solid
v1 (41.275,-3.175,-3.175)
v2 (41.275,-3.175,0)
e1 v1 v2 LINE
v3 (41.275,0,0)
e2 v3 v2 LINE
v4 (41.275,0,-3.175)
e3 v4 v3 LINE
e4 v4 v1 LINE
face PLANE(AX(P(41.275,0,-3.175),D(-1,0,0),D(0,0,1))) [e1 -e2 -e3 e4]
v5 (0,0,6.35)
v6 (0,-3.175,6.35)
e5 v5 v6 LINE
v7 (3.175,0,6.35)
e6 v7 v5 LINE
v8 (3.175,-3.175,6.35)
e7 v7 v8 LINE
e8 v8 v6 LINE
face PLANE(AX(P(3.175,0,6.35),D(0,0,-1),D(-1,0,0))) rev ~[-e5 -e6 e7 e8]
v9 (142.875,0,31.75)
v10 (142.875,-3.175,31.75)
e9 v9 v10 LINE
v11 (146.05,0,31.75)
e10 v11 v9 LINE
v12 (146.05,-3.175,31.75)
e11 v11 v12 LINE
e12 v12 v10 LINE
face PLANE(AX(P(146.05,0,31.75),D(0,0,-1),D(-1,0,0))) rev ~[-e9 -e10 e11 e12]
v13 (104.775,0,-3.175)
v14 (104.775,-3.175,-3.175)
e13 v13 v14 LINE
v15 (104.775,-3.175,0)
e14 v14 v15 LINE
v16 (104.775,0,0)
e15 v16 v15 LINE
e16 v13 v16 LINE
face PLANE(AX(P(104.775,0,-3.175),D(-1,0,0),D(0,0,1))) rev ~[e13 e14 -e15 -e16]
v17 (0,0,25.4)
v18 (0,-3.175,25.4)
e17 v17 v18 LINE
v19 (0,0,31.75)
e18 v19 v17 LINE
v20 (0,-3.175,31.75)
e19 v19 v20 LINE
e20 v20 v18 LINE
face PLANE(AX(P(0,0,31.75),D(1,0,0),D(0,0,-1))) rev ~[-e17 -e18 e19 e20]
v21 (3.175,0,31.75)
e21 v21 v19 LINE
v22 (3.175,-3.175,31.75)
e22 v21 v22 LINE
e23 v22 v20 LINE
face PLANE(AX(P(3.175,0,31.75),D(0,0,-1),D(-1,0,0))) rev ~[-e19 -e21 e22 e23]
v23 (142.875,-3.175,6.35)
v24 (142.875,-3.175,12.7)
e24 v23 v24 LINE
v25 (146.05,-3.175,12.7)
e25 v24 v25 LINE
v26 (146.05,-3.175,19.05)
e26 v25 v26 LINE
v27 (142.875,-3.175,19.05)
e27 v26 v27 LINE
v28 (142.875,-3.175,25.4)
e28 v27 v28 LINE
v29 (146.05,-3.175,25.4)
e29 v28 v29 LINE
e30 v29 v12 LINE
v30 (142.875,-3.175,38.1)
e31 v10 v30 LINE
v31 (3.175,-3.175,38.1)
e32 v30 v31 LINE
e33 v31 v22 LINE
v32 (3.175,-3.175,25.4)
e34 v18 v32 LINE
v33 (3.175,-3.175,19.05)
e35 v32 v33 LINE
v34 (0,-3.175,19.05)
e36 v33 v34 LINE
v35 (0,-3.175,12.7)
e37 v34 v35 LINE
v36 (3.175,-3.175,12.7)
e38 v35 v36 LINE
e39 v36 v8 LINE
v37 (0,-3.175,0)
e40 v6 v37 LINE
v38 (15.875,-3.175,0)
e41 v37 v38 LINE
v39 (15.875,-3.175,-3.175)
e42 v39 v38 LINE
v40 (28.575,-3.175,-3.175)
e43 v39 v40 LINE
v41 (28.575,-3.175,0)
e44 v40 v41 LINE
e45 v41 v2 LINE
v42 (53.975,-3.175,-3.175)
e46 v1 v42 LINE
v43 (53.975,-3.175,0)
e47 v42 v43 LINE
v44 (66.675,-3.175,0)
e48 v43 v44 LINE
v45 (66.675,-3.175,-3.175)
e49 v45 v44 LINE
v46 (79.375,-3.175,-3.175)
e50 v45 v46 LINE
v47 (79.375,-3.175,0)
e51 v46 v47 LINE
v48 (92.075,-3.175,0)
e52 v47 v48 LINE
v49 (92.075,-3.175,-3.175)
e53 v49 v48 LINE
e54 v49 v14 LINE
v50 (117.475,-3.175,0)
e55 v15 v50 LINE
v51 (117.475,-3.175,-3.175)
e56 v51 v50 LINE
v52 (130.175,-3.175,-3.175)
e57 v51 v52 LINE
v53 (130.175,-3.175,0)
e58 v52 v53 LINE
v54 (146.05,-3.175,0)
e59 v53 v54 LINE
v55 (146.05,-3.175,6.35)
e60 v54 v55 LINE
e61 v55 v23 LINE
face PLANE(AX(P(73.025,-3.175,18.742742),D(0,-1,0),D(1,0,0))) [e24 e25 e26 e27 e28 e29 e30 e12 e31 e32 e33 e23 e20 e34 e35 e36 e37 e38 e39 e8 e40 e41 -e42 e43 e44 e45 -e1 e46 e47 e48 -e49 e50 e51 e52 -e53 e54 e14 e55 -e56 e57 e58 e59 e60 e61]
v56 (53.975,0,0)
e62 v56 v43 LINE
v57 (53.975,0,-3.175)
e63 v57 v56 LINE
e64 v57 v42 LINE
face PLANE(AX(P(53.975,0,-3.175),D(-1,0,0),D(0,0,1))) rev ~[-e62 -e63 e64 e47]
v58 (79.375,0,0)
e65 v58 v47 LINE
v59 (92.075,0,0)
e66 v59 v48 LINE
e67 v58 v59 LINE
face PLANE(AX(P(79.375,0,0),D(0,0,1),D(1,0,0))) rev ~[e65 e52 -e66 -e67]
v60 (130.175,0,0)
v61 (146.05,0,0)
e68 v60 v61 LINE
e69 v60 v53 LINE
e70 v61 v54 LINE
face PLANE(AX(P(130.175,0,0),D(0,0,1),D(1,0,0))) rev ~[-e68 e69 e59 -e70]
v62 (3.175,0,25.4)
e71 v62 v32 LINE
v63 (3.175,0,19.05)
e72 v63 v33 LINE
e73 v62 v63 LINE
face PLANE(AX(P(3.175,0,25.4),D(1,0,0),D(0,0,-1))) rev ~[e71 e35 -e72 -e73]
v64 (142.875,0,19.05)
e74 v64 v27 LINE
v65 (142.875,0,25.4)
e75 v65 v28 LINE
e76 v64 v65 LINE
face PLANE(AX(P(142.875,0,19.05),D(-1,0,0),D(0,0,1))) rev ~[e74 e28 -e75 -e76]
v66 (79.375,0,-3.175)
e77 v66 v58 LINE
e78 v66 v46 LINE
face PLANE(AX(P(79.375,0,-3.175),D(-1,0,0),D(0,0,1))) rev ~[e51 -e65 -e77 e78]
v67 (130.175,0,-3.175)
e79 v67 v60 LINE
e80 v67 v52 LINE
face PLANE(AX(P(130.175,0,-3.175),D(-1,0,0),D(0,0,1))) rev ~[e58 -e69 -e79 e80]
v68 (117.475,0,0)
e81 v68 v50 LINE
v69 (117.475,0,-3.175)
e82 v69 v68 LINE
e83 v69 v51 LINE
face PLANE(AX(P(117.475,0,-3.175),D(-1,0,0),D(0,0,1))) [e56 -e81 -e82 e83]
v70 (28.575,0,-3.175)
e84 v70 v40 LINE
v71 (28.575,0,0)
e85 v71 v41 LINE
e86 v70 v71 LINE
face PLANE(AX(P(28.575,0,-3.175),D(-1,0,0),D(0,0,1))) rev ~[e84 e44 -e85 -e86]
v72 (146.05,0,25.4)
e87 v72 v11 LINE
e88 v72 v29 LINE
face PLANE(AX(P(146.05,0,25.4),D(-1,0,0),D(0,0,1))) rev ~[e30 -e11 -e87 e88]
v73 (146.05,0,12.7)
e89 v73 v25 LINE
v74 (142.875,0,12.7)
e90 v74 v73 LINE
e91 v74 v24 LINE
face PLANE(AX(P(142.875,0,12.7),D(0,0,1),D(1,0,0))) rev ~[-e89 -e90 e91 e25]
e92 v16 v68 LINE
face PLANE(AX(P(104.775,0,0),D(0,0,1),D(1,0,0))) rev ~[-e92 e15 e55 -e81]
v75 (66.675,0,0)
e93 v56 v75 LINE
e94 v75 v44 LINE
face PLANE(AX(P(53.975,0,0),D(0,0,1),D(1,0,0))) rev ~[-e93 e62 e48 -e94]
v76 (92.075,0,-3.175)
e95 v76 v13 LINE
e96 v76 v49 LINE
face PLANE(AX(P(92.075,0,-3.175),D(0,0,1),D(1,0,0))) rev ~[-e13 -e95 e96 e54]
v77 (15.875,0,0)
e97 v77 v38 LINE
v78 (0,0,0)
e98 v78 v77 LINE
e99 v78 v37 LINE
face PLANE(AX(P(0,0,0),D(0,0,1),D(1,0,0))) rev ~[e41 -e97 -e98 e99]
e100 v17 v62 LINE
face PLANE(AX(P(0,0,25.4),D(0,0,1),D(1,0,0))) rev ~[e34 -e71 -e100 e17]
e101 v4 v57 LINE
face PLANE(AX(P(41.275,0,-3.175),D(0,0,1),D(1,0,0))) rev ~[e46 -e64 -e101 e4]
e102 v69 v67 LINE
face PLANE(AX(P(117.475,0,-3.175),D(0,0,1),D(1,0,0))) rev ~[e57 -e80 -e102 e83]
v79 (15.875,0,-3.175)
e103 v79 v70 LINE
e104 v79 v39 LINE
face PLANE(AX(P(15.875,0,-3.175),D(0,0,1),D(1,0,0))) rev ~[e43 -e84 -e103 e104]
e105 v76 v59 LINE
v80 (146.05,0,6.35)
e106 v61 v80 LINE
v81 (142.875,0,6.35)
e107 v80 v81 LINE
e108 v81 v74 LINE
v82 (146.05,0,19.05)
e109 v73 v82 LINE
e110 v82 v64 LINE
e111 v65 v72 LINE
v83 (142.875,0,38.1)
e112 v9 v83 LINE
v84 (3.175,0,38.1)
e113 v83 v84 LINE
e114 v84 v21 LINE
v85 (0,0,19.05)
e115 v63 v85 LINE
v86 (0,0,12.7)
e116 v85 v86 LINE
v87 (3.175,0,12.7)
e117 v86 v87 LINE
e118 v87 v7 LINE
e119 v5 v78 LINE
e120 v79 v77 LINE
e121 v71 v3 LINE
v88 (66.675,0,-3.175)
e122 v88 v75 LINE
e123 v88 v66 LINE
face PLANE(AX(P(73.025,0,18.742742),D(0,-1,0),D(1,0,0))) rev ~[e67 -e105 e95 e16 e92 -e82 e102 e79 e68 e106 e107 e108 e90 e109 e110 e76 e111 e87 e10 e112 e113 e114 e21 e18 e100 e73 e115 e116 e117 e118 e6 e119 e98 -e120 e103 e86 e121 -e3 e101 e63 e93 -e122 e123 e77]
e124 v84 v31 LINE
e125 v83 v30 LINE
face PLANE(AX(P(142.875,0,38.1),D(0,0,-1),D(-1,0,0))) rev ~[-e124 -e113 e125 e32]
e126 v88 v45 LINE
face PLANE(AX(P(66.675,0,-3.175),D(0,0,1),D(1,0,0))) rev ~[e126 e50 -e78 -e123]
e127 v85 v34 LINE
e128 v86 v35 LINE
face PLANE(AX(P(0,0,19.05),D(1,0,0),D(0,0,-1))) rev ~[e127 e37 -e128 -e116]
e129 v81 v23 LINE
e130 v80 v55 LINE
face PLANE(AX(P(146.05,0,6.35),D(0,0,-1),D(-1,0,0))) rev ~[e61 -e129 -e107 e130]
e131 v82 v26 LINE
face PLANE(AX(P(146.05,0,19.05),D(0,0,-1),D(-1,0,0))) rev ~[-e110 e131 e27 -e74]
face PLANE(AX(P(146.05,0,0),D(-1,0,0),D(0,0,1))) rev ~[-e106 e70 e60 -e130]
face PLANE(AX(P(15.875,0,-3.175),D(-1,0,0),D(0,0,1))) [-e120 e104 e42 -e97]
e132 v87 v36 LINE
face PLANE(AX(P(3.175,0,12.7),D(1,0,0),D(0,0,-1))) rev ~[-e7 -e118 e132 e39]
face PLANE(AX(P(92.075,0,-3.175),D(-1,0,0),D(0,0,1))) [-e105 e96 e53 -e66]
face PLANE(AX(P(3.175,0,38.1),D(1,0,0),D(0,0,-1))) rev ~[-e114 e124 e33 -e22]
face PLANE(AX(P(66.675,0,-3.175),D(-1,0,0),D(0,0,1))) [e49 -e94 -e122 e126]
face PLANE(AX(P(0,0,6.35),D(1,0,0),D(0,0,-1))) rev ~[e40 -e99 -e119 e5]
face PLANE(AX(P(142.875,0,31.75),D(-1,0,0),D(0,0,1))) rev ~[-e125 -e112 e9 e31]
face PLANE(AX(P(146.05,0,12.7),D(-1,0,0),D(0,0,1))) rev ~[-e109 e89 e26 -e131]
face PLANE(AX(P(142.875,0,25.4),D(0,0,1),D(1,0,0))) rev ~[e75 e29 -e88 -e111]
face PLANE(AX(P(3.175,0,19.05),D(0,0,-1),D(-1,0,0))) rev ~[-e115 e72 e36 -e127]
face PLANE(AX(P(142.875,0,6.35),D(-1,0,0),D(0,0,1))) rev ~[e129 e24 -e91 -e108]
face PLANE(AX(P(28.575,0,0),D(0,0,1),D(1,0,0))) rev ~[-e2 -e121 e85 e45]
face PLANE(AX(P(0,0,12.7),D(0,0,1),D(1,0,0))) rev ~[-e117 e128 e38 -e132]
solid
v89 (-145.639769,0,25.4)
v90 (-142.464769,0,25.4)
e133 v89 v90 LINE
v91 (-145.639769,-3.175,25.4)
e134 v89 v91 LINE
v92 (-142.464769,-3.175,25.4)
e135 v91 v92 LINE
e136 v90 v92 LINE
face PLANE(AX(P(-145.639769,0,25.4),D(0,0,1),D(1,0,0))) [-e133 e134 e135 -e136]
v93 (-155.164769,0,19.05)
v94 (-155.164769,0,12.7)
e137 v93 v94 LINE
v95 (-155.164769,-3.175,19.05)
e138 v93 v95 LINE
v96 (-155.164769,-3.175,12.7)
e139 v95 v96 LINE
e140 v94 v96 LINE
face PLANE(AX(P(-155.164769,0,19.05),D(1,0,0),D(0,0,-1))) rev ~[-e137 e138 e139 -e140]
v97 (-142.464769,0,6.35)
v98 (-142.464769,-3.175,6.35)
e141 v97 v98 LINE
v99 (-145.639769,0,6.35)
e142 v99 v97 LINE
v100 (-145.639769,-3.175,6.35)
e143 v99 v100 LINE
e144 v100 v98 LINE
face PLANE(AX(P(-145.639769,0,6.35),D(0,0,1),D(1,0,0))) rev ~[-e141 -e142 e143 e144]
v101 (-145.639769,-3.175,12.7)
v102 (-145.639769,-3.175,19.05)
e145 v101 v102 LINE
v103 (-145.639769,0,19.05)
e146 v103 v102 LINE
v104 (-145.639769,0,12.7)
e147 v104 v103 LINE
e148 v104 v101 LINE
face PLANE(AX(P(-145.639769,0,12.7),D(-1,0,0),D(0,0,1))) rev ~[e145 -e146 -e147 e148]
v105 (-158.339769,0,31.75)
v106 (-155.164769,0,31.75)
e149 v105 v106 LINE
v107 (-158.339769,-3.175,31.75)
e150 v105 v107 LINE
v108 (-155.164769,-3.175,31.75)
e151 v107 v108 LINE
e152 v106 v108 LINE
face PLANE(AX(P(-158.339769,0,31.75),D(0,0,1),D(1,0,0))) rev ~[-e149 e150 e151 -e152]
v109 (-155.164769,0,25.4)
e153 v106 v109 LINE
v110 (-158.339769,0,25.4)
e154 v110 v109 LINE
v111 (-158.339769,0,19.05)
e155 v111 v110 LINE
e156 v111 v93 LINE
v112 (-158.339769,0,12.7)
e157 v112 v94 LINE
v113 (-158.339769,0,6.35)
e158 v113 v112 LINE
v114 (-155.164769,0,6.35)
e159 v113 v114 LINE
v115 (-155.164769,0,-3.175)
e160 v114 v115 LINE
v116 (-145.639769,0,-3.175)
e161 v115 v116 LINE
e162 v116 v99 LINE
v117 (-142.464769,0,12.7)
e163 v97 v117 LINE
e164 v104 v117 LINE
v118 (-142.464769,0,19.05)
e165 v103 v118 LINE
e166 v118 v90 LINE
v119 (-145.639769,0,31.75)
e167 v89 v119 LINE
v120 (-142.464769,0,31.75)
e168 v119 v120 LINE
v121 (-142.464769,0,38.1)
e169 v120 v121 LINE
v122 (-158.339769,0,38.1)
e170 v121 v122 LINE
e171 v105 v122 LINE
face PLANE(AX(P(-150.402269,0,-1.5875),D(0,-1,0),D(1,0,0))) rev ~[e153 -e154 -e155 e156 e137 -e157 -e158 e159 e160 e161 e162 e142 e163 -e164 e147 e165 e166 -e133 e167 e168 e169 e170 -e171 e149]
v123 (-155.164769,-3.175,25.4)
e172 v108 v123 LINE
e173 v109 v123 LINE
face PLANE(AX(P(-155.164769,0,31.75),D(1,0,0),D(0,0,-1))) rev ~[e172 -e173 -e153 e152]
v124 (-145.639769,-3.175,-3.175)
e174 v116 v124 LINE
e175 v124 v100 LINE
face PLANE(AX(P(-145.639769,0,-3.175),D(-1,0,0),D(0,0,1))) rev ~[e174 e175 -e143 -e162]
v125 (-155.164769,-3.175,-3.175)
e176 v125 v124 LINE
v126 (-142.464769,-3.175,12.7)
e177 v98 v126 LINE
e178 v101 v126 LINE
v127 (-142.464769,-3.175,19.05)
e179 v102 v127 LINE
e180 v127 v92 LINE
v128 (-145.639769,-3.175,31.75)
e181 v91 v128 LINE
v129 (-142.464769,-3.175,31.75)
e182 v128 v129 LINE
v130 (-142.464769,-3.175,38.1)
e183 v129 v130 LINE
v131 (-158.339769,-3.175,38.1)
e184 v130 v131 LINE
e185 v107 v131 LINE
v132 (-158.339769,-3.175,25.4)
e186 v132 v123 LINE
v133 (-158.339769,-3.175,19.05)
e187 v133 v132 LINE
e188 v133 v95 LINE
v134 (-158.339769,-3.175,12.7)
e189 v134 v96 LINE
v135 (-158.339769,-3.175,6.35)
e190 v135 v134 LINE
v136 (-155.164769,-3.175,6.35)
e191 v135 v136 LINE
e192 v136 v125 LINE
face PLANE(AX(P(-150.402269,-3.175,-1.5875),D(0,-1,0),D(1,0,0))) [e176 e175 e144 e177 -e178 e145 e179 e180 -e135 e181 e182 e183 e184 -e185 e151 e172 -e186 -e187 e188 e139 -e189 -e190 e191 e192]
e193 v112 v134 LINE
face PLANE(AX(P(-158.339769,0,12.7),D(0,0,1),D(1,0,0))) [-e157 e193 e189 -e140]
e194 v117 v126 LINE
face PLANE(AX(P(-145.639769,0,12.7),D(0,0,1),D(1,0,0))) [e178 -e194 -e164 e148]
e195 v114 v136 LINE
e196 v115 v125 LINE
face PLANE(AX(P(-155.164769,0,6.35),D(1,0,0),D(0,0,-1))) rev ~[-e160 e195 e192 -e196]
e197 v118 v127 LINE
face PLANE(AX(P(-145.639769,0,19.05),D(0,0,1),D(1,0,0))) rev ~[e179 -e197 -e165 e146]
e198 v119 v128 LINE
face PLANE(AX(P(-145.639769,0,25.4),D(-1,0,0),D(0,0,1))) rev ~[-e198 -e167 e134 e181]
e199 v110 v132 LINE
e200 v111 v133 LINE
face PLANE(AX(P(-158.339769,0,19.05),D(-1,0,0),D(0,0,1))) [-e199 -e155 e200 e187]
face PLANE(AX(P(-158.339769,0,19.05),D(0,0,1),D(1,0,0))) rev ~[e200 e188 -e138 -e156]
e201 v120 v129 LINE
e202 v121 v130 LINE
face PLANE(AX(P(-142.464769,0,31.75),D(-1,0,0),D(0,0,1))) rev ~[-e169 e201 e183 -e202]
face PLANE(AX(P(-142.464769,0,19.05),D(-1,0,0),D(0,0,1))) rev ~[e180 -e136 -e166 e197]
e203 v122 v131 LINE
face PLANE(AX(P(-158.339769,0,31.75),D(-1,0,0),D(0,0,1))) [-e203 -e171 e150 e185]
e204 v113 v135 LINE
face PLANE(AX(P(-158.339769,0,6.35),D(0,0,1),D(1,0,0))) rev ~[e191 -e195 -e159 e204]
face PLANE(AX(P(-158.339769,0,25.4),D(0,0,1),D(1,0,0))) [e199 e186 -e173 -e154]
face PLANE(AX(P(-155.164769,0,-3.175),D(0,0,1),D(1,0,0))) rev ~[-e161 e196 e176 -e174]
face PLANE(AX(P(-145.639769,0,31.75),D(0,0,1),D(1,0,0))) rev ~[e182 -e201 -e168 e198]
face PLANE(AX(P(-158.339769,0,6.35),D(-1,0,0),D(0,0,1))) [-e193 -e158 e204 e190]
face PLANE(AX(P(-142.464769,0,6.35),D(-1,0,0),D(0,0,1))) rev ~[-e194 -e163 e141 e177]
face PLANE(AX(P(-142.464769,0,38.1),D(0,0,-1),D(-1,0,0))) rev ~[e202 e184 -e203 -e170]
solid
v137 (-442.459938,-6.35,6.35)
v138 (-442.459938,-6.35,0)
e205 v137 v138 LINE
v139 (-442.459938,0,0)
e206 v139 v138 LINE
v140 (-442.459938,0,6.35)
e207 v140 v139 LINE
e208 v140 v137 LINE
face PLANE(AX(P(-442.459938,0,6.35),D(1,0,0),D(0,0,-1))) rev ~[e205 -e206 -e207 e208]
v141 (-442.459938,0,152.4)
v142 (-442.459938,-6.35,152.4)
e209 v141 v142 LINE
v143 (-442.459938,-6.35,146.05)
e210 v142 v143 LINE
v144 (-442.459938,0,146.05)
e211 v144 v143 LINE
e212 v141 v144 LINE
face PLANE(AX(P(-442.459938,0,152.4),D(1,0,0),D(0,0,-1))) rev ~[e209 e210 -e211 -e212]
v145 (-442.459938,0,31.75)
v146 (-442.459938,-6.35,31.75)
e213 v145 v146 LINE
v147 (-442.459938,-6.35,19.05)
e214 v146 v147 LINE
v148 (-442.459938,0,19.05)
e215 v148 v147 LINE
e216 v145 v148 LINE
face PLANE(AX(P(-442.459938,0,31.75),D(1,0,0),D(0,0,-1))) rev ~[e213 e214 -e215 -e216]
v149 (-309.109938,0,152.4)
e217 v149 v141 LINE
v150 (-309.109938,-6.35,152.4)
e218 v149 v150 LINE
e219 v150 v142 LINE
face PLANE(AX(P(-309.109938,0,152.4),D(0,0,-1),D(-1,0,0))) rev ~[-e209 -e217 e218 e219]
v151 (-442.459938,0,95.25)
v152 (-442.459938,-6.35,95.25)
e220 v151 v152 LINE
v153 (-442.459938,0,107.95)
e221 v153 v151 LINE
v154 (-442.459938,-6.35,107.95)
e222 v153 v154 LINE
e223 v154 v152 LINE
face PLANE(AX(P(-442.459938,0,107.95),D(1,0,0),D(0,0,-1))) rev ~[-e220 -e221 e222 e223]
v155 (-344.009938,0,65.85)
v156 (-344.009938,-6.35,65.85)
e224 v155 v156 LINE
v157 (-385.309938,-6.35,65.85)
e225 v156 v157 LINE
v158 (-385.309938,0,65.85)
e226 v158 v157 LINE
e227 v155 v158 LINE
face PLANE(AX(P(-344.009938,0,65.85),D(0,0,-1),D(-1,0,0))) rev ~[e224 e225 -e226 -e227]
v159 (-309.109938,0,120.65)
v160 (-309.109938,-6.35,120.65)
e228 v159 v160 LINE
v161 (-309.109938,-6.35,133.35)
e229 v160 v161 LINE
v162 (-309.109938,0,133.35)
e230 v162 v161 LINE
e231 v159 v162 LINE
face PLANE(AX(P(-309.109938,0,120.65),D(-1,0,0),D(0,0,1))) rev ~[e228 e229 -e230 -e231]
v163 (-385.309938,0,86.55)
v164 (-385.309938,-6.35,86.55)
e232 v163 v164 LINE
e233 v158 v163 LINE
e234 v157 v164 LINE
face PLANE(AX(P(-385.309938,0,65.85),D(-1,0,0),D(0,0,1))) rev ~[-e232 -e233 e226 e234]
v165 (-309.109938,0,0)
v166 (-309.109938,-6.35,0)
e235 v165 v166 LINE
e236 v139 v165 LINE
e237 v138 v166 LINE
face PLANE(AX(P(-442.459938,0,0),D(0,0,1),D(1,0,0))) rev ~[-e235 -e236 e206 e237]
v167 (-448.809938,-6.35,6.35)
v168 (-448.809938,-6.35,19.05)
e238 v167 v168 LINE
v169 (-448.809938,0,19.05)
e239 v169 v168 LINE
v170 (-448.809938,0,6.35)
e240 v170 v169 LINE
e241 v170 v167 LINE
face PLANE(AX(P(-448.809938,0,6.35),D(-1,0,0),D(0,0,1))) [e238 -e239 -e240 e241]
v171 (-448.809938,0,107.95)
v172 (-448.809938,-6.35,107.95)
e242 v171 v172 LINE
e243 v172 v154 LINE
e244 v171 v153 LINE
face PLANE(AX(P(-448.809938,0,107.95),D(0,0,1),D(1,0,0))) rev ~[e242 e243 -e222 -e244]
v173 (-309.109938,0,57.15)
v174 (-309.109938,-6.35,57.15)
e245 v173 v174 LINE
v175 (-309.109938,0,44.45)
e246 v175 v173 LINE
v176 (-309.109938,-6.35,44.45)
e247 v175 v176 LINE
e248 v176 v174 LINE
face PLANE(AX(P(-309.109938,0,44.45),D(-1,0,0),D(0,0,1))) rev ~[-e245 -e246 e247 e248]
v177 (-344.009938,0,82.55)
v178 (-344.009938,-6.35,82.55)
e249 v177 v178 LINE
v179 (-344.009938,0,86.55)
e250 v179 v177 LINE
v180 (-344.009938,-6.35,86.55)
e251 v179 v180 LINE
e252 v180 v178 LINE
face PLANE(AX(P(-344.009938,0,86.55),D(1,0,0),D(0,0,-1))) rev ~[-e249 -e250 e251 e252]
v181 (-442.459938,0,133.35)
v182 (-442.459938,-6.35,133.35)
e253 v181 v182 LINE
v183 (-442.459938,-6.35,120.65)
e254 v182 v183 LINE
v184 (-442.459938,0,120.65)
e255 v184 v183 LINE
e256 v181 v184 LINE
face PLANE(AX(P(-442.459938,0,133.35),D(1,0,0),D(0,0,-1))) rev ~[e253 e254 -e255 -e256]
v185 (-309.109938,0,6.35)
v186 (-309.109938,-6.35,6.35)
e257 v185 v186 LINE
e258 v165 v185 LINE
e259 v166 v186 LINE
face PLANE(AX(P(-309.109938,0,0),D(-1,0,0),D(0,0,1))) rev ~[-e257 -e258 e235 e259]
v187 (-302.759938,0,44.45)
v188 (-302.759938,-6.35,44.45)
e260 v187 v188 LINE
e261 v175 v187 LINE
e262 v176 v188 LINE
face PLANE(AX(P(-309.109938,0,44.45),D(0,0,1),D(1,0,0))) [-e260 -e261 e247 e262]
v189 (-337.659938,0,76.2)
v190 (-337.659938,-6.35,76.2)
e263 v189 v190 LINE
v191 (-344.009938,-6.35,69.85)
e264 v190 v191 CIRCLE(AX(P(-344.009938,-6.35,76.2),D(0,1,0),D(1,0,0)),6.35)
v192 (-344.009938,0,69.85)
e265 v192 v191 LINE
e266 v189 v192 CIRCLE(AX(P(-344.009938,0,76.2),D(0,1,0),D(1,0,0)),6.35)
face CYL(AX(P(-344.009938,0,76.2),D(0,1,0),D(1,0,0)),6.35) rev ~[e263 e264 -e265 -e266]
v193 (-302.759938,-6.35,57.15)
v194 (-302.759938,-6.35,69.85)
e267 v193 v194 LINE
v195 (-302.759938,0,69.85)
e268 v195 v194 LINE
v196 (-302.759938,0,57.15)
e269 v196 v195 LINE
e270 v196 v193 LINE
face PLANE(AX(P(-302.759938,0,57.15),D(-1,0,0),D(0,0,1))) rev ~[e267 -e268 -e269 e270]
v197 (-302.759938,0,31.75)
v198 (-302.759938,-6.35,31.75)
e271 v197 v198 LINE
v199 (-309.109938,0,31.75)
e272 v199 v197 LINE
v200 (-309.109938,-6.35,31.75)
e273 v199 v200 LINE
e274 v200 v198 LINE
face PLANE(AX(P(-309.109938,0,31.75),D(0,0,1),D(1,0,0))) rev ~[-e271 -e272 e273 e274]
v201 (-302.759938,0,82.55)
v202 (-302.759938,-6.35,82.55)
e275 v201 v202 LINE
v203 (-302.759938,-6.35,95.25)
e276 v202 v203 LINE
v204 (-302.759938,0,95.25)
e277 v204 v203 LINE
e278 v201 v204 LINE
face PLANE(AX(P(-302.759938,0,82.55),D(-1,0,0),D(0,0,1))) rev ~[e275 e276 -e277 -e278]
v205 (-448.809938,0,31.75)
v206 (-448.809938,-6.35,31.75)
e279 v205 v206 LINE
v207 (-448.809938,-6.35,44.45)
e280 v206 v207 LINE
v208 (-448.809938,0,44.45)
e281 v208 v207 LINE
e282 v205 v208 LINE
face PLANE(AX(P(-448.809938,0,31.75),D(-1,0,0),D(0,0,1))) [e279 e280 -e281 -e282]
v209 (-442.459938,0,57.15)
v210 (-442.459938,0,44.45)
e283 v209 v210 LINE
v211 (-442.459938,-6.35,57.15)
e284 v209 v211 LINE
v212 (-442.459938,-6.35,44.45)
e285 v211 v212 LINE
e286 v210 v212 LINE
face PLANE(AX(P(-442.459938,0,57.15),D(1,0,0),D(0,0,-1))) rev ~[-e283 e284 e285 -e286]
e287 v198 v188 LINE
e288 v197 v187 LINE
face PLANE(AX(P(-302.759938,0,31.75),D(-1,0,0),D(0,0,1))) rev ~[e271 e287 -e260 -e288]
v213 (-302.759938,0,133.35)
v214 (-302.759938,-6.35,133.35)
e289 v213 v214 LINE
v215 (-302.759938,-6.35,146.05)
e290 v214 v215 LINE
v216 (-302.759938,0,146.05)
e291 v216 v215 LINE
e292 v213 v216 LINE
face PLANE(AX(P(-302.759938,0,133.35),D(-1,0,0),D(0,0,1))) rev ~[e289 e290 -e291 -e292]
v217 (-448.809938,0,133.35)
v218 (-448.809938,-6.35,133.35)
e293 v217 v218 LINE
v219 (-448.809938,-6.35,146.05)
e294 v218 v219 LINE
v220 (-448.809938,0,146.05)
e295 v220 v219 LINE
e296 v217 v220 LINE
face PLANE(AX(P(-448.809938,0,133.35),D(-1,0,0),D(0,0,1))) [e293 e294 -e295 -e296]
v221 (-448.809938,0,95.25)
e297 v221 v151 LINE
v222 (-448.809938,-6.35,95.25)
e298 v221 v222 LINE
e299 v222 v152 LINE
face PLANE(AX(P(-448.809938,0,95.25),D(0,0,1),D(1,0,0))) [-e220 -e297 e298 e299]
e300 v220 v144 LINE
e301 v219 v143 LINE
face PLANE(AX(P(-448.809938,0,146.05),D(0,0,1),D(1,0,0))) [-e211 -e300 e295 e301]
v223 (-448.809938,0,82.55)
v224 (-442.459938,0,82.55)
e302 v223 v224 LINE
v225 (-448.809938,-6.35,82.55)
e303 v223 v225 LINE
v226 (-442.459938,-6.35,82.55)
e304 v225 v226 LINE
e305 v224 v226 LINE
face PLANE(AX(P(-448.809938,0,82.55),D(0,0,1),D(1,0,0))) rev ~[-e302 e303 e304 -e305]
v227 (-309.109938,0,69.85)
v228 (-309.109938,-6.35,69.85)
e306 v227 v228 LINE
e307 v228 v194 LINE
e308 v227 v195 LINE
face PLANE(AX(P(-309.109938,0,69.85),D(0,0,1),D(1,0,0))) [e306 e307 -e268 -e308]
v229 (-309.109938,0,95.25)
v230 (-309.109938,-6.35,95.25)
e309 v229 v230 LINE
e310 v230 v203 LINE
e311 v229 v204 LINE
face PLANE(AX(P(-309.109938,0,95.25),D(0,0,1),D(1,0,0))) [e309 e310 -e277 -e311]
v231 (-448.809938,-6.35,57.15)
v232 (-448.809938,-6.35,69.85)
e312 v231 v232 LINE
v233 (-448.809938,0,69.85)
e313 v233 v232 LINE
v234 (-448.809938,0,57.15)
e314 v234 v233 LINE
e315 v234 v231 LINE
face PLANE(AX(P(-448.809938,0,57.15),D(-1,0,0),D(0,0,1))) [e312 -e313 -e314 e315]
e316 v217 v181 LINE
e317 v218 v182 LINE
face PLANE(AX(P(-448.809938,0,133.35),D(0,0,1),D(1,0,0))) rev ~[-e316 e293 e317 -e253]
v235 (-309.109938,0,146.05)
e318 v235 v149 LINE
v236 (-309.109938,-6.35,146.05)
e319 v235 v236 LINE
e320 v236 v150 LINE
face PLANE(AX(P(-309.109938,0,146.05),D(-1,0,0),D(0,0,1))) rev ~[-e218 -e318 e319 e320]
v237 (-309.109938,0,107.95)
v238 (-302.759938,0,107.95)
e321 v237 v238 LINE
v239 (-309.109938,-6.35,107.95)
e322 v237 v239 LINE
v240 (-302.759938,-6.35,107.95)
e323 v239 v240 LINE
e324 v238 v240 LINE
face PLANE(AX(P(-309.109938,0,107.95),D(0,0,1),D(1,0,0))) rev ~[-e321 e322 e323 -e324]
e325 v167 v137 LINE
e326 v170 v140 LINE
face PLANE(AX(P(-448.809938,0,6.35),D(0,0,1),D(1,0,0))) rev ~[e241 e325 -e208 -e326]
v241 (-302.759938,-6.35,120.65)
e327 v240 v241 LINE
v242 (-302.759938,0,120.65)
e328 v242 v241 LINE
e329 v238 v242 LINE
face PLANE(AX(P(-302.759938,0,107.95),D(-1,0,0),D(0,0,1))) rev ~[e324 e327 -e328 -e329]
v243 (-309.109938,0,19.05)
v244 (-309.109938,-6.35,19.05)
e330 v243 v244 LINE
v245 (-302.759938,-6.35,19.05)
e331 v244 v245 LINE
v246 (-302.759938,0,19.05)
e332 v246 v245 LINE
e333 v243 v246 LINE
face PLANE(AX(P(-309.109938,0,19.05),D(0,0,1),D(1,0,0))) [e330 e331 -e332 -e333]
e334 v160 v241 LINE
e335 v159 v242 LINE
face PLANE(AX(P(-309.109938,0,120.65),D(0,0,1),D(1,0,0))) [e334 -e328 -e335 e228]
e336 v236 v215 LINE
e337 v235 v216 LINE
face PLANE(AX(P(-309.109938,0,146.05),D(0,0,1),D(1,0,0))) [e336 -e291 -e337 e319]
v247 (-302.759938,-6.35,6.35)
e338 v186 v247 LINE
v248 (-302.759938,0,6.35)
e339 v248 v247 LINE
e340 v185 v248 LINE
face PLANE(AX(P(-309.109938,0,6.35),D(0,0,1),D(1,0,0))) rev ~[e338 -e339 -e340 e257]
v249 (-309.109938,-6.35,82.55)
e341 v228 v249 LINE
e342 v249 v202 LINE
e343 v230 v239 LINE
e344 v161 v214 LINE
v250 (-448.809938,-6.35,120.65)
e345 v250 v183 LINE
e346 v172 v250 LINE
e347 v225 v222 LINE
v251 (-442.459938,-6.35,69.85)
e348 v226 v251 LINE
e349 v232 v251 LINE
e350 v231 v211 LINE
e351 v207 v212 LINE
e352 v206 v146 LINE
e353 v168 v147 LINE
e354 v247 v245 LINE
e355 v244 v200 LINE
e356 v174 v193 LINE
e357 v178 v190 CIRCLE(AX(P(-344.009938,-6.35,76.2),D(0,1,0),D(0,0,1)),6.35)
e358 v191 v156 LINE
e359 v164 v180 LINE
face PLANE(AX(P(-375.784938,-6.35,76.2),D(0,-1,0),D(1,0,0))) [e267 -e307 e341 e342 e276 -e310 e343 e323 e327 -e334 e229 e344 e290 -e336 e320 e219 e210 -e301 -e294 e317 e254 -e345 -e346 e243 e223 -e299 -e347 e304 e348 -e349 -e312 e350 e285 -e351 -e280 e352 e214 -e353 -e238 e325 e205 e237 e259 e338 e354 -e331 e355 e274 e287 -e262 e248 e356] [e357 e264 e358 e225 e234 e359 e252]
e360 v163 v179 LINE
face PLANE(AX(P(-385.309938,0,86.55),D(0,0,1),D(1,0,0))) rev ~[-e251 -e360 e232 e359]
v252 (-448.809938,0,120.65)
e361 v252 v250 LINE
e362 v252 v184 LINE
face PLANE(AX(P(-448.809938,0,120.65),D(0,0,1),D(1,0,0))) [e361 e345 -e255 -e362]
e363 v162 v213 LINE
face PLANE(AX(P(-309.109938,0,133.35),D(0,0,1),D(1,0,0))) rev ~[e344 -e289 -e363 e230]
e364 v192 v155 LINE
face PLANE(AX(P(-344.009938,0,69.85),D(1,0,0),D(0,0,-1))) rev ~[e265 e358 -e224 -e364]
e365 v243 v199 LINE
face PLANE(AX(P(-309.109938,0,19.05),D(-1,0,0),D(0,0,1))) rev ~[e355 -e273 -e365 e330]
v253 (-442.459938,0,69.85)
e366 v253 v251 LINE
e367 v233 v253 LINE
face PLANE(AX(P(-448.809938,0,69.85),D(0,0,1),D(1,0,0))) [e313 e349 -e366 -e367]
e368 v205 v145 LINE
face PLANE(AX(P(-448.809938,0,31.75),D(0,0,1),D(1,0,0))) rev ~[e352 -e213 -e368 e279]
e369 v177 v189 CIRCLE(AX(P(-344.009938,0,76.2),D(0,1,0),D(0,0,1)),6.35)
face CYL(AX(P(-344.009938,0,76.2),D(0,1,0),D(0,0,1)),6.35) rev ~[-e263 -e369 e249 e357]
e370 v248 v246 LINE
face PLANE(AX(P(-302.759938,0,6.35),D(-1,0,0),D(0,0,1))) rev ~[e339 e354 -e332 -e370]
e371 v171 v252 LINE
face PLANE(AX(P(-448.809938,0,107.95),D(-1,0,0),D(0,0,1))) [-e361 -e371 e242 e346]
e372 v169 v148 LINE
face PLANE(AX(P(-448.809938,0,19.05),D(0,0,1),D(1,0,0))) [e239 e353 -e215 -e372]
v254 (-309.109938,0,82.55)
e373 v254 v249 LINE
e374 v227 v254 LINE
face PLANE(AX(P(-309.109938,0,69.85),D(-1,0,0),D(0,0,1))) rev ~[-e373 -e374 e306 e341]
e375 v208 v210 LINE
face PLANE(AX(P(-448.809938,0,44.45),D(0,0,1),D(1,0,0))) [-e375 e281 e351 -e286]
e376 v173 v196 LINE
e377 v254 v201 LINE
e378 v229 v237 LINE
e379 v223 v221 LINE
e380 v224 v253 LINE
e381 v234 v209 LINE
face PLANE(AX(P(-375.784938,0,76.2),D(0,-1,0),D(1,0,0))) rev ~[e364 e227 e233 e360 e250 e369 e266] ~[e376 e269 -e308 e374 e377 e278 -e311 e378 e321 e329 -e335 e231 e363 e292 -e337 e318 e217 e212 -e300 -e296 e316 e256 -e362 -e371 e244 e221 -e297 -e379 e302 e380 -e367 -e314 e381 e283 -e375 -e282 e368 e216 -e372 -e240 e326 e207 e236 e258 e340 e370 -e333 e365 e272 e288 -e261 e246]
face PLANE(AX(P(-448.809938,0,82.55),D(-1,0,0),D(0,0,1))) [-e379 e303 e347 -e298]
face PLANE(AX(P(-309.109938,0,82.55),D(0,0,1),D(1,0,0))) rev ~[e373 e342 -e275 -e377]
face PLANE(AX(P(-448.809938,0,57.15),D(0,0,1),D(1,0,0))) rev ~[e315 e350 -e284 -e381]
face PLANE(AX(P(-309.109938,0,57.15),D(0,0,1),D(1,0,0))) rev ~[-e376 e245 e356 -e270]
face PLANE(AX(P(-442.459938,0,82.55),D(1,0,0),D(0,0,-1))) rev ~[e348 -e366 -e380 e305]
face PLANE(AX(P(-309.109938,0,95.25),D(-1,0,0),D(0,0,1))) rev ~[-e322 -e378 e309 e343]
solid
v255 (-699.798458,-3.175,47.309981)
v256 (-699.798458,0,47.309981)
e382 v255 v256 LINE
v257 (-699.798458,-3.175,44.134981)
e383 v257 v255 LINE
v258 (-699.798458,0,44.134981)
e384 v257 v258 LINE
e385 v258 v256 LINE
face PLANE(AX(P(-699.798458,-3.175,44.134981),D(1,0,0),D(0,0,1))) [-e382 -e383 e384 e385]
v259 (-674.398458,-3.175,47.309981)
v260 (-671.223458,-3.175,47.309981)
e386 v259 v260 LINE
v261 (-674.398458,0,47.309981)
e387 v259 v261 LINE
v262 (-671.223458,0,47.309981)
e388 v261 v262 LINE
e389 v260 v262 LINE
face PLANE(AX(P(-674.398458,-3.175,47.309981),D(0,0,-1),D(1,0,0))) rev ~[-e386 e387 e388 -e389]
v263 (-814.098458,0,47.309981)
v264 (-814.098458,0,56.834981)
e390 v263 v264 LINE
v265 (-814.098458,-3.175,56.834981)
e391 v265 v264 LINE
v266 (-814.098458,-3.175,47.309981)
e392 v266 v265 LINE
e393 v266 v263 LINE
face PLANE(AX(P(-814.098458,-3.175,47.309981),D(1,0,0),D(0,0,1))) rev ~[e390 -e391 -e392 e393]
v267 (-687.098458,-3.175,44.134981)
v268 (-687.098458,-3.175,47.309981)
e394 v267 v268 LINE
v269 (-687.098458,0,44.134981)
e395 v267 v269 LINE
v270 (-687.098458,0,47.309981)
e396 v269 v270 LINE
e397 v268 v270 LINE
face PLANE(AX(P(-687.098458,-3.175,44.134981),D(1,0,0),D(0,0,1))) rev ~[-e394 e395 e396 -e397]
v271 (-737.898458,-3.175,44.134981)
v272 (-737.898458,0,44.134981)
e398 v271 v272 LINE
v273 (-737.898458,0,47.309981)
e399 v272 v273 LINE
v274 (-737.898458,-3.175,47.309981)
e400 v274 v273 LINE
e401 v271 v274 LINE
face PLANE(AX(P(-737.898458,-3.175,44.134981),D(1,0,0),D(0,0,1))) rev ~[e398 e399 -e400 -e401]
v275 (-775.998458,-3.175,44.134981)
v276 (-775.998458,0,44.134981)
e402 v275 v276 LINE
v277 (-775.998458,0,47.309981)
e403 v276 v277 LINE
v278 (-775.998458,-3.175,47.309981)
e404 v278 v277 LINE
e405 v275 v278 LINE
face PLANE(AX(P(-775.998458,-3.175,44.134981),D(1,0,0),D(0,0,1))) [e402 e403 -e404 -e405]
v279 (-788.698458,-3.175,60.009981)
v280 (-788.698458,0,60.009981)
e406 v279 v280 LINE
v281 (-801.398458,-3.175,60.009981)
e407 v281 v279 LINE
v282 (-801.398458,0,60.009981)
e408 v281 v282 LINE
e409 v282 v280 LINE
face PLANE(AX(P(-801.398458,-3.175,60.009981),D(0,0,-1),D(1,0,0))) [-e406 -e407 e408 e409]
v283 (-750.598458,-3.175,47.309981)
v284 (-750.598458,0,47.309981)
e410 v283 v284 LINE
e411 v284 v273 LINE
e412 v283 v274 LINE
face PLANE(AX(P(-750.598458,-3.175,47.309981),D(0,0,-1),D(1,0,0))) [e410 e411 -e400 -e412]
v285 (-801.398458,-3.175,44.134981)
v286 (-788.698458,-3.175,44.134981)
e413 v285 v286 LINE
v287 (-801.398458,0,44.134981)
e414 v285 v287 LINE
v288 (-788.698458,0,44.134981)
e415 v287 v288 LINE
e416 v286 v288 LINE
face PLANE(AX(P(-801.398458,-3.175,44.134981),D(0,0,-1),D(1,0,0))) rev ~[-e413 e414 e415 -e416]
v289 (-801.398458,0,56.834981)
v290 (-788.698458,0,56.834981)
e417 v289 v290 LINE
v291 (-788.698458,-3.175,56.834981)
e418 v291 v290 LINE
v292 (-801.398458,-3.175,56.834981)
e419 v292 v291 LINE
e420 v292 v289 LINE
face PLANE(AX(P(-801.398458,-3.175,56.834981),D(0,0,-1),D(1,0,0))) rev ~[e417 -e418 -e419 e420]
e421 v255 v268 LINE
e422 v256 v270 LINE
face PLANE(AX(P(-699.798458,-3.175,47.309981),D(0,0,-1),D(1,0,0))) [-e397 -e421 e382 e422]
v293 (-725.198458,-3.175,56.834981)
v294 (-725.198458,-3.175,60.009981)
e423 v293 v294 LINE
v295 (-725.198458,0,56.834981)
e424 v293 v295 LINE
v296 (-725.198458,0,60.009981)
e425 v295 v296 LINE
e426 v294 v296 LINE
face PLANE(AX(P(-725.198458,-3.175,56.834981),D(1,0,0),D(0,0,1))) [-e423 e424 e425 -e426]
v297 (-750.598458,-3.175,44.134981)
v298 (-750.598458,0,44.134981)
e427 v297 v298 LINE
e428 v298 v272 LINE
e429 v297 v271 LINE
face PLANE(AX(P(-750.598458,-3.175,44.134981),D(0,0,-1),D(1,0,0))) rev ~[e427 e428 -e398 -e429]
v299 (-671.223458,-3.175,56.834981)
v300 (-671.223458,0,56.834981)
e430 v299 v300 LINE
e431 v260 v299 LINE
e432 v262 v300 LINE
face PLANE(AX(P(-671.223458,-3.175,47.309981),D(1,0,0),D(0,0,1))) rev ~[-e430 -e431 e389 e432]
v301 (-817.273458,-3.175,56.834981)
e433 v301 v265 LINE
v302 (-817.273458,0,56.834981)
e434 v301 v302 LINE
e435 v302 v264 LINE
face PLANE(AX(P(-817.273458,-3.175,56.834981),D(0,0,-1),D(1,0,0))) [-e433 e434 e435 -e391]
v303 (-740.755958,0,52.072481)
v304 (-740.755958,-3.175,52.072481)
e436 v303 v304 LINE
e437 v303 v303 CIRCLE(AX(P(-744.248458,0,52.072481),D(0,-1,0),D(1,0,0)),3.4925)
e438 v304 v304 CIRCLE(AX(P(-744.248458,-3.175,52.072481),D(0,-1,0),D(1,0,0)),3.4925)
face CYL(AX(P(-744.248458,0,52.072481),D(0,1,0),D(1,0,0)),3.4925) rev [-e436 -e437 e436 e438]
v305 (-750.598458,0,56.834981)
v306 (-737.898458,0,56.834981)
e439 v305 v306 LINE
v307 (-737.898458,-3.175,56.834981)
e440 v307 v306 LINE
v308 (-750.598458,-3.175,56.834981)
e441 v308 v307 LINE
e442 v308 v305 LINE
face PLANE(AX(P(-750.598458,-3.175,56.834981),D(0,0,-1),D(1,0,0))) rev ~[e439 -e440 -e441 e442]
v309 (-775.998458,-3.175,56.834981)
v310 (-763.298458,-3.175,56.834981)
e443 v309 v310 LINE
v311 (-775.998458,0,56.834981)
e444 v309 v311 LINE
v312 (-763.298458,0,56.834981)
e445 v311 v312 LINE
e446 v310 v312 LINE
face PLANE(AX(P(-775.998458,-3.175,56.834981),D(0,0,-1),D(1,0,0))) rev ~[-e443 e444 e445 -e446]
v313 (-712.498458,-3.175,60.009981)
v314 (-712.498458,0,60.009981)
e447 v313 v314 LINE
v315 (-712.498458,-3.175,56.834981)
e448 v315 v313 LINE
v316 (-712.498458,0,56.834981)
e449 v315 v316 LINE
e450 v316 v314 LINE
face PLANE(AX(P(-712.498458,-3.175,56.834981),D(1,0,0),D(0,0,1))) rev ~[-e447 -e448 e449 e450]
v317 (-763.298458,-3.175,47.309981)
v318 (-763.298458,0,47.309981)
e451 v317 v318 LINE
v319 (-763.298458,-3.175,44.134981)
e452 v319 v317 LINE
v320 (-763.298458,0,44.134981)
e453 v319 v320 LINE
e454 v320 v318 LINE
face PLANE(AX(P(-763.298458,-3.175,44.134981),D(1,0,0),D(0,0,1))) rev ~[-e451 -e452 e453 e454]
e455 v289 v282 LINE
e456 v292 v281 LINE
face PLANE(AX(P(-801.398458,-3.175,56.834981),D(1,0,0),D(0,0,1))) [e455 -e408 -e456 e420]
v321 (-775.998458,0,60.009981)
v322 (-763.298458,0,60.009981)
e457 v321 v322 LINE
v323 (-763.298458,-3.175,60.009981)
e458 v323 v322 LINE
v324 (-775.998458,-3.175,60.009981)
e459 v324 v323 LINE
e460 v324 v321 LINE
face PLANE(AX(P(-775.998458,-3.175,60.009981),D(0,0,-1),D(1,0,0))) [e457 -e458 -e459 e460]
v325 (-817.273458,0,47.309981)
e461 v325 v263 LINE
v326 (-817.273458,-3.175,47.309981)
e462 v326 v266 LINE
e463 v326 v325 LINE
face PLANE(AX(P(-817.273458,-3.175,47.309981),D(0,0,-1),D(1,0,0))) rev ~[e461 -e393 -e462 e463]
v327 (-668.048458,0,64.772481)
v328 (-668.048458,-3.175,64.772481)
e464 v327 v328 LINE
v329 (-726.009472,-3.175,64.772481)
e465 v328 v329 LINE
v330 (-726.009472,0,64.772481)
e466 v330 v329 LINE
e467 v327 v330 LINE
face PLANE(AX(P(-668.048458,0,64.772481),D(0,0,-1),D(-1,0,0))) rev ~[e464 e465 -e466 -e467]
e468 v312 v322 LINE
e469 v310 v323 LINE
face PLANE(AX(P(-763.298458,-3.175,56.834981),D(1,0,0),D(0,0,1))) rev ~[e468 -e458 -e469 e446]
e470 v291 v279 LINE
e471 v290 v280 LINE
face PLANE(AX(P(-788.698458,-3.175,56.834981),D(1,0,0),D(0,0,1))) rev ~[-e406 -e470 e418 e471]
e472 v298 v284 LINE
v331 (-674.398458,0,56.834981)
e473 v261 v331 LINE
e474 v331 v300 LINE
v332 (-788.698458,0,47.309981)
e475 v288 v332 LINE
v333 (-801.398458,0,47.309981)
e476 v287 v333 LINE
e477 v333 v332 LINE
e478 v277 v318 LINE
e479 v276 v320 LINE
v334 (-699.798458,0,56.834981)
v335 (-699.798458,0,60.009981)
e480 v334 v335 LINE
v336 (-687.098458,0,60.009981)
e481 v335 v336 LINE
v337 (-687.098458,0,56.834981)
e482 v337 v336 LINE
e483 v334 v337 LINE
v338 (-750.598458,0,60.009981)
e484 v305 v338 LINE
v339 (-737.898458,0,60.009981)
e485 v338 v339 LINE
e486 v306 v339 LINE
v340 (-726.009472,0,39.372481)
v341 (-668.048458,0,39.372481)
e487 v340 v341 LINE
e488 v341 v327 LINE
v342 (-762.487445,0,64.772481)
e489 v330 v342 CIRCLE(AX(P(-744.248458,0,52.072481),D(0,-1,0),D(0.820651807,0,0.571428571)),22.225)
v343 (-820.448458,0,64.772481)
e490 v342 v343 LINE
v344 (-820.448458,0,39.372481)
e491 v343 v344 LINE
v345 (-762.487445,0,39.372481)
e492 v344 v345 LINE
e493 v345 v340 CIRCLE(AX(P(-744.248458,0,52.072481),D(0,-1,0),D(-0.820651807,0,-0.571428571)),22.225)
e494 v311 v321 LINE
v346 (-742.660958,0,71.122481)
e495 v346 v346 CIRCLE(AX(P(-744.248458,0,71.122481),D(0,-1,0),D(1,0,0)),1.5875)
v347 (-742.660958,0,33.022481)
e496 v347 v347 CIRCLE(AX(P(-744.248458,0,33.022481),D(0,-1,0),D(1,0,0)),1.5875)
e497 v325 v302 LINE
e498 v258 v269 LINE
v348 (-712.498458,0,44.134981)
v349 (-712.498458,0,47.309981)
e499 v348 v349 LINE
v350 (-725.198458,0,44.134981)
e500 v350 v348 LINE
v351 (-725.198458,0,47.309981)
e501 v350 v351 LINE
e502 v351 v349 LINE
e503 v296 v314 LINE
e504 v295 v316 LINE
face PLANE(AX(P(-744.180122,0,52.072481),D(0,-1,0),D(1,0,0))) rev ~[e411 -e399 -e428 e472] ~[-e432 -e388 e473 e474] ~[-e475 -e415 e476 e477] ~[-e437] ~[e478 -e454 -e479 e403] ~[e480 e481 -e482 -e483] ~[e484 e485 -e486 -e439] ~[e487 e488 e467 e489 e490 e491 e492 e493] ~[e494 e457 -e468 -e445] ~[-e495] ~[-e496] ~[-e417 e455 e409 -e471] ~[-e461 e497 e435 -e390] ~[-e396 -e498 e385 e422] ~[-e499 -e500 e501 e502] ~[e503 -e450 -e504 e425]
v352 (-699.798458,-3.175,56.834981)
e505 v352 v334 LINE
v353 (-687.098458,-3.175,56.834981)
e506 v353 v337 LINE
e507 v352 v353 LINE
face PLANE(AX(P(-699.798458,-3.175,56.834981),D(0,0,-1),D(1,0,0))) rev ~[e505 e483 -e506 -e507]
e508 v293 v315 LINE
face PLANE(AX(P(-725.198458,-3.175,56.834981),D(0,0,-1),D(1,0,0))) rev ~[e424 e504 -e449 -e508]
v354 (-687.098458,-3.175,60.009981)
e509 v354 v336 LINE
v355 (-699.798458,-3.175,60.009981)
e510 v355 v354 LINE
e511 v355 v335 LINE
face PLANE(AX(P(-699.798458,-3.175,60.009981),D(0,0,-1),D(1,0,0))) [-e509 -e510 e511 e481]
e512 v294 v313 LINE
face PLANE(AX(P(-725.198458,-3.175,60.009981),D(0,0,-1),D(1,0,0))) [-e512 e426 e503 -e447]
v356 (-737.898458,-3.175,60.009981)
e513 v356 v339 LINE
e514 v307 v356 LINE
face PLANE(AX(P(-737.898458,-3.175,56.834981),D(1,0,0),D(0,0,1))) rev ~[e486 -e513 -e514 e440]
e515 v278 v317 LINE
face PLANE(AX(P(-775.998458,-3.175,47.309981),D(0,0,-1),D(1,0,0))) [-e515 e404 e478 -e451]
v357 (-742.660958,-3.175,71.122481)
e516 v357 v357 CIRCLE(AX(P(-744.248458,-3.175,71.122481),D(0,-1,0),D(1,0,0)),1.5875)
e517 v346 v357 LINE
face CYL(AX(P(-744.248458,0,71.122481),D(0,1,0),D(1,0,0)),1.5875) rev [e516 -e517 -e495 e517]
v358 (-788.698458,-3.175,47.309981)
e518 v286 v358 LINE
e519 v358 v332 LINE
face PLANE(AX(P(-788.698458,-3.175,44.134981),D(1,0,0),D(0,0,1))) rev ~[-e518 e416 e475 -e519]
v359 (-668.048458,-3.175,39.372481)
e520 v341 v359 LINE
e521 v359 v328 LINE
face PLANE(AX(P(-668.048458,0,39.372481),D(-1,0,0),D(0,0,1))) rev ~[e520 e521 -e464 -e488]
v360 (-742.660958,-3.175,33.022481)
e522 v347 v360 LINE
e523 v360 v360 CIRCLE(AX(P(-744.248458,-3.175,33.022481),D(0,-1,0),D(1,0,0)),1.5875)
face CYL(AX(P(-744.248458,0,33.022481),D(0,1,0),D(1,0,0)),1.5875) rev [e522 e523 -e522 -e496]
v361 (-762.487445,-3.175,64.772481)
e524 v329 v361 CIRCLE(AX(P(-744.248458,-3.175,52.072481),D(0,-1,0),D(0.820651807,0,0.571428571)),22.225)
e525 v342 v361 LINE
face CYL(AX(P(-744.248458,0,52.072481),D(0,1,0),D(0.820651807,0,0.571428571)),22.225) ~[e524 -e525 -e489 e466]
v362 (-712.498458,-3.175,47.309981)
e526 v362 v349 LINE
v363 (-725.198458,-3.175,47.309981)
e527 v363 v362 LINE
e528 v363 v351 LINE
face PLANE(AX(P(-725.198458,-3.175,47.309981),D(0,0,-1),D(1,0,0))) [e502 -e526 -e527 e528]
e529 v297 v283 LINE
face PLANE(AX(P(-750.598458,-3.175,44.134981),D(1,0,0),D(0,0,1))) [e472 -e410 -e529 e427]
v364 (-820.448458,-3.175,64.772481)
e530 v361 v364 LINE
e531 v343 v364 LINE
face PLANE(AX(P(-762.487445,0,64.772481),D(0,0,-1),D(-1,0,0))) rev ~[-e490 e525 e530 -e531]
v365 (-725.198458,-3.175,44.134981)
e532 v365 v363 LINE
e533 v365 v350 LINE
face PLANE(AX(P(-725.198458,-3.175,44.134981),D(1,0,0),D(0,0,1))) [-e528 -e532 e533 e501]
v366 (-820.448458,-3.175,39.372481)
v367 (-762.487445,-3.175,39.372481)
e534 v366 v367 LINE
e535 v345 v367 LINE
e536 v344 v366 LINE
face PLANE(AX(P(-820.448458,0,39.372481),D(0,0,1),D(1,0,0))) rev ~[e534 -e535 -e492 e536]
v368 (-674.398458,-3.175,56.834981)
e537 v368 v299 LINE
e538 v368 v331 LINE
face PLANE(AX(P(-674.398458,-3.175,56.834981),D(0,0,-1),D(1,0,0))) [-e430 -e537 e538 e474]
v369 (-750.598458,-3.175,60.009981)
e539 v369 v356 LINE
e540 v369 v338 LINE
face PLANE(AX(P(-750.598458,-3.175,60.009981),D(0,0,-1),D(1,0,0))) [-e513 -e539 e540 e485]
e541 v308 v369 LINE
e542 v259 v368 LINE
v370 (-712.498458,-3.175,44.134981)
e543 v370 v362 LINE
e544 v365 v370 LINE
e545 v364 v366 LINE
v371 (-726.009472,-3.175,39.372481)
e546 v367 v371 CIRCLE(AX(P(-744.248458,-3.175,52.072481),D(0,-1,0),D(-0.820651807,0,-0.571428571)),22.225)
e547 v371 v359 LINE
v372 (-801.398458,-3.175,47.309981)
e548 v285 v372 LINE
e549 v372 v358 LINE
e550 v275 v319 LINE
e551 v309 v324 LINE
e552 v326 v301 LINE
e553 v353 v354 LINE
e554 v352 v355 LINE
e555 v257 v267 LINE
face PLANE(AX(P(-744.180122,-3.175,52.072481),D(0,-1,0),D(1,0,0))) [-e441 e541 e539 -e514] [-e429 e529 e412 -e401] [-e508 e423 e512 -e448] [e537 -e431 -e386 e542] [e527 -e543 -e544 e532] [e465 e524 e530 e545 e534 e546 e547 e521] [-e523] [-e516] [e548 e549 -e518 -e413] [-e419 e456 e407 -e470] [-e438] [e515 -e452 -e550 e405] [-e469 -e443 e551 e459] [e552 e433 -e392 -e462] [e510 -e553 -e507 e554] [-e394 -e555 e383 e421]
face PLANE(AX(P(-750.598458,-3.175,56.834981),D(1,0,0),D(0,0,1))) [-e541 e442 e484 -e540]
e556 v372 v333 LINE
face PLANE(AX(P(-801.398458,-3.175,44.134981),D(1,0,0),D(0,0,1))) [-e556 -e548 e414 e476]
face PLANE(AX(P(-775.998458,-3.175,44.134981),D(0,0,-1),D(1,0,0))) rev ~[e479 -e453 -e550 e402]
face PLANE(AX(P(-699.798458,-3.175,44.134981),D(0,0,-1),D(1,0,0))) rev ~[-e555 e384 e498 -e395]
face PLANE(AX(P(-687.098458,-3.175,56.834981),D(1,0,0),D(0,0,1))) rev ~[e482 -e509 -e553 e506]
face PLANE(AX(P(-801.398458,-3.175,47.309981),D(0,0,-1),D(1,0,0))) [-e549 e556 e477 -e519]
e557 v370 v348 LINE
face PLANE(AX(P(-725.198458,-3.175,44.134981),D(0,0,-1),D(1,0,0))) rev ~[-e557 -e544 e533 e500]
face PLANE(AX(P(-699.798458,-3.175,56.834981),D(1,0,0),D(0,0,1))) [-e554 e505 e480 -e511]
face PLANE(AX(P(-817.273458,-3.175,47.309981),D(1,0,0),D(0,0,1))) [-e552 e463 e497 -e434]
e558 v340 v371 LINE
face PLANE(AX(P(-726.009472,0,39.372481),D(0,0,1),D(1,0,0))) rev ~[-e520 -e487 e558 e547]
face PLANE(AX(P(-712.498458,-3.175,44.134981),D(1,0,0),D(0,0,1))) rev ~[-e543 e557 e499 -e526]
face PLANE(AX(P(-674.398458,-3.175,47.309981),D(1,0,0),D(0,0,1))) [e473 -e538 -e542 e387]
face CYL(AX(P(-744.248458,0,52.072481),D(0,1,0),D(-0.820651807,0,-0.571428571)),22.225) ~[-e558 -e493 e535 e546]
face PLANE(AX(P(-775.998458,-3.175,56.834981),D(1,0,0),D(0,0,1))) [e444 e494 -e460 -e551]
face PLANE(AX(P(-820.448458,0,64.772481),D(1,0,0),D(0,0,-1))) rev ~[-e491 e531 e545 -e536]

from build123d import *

# Parameters (mm, degrees)
F0_W     = 12.7
F0_H     = 3.175
F1_DEPTH = 3.175
F2_W     = 9.525
F2_H     = 3.175
F2_W_2   = 3.175
F2_H_2   = 6.35
F3_DEPTH = 3.175
F4_W     = 6.35
F4_H     = 12.7
F5_DEPTH = 6.35
F6_R     = 3.4925
F6_R_2   = 1.5875
F7_DEPTH = 3.175
F8_W     = 12.7
F8_H     = 3.175
F8_W_2   = 3.175
F8_H_2   = 9.525
F9_DEPTH = 3.175


with BuildPart() as f1:
    # F0 (on Front) → F1 (new body)
    with BuildSketch(Plane.XZ):
        Polygon((0, 6.35), (0, 0), (15.875, 0), (28.575, 0), (41.275, 0), (53.975, 0), (66.675, 0), (79.375, 0), (92.075, 0), (104.775, 0), (117.475, 0), (130.175, 0), (146.05, 0), (146.05, 6.35), (142.875, 6.35), (142.875, 12.7), (146.05, 12.7), (146.05, 19.05), (142.875, 19.05), (142.875, 25.4), (146.05, 25.4), (146.05, 31.75), (142.875, 31.75), (142.875, 38.1), (3.175, 38.1), (3.175, 31.75), (0, 31.75), (0, 25.4), (3.175, 25.4), (3.175, 19.05), (0, 19.05), (0, 12.7), (3.175, 12.7), (3.175, 6.35), align=None)
        with Locations((22.225, -1.5875)):
            Rectangle(F0_W, F0_H)
        with Locations((47.625, -1.5875)):
            Rectangle(F0_W, F0_H)
        with Locations((73.025, -1.5875)):
            Rectangle(F0_W, F0_H)
        with Locations((98.425, -1.5875)):
            Rectangle(F0_W, F0_H)
        with Locations((123.825, -1.5875)):
            Rectangle(F0_W, F0_H)
    extrude(amount=F1_DEPTH)


with BuildPart() as f3:
    # F2 (on Front) → F3 (new body)
    with BuildSketch(Plane.XZ):
        with Locations((-150.4022690821, -1.5875)):
            Rectangle(F2_W, F2_H)
        Polygon((-155.1647690821, 0), (-145.6397690821, 0), (-145.6397690821, 6.35), (-145.6397690821, 12.7), (-145.6397690821, 19.05), (-145.6397690821, 25.4), (-145.6397690821, 31.75), (-145.6397690821, 38.1), (-155.1647690821, 38.1), (-155.1647690821, 31.75), (-155.1647690821, 25.4), (-155.1647690821, 19.05), (-155.1647690821, 12.7), (-155.1647690821, 6.35), align=None)
        with Locations((-144.0522690821, 9.525)):
            Rectangle(F2_W_2, F2_H_2)
        with Locations((-156.7522690821, 9.525)):
            Rectangle(F2_W_2, F2_H_2)
        with Locations((-144.0522690821, 22.225)):
            Rectangle(F2_W_2, F2_H_2)
        with Locations((-156.7522690821, 22.225)):
            Rectangle(F2_W_2, F2_H_2)
        with Locations((-144.0522690821, 34.925)):
            Rectangle(F2_W_2, F2_H_2)
        with Locations((-156.7522690821, 34.925)):
            Rectangle(F2_W_2, F2_H_2)
    extrude(amount=F3_DEPTH)


with BuildPart() as f5:
    # F4 (on Front) → F5 (new body)
    with BuildSketch(Plane.XZ):
        Polygon((-442.4599377941, 0), (-309.1099377941, 0), (-309.1099377941, 6.35), (-309.1099377941, 19.05), (-309.1099377941, 31.75), (-309.1099377941, 44.45), (-309.1099377941, 57.15), (-309.1099377941, 69.85), (-309.1099377941, 82.55), (-309.1099377941, 95.25), (-309.1099377941, 107.95), (-309.1099377941, 120.65), (-309.1099377941, 133.35), (-309.1099377941, 146.05), (-309.1099377941, 152.4), (-442.4599377941, 152.4), (-442.4599377941, 146.05), (-442.4599377941, 133.35), (-442.4599377941, 127), (-442.4599377941, 120.65), (-442.4599377941, 107.95), (-442.4599377941, 101.6), (-442.4599377941, 95.25), (-442.4599377941, 82.55), (-442.4599377941, 76.2), (-442.4599377941, 69.85), (-442.4599377941, 57.15), (-442.4599377941, 50.8), (-442.4599377941, 44.45), (-442.4599377941, 31.75), (-442.4599377941, 19.05), (-442.4599377941, 6.35), align=None)
        with BuildLine():
            Line((-385.3099377941, 65.85), (-385.3099377941, 86.55))
            Line((-385.3099377941, 86.55), (-344.0099377941, 86.55))
            Line((-344.0099377941, 86.55), (-344.0099377941, 82.55))
            ThreePointArc((-344.0099377941, 82.55), (-339.5198097336, 80.6901280605), (-337.6599377941, 76.2))
            ThreePointArc((-337.6599377941, 76.2), (-339.5198097336, 71.7098719395), (-344.0099377941, 69.85))
            Line((-344.0099377941, 69.85), (-344.0099377941, 65.85))
            Line((-344.0099377941, 65.85), (-385.3099377941, 65.85))
        make_face(mode=Mode.SUBTRACT)
        with Locations((-305.9349377941, 12.7)):
            Rectangle(F4_W, F4_H)
        with Locations((-445.6349377941, 12.7)):
            Rectangle(F4_W, F4_H)
        with Locations((-305.9349377941, 38.1)):
            Rectangle(F4_W, F4_H)
        with Locations((-445.6349377941, 38.1)):
            Rectangle(F4_W, F4_H)
        with Locations((-305.9349377941, 63.5)):
            Rectangle(F4_W, F4_H)
        with Locations((-445.6349377941, 63.5)):
            Rectangle(F4_W, F4_H)
        with Locations((-305.9349377941, 88.9)):
            Rectangle(F4_W, F4_H)
        with Locations((-305.9349377941, 114.3)):
            Rectangle(F4_W, F4_H)
        with Locations((-445.6349377941, 88.9)):
            Rectangle(F4_W, F4_H)
        with Locations((-305.9349377941, 139.7)):
            Rectangle(F4_W, F4_H)
        with Locations((-445.6349377941, 114.3)):
            Rectangle(F4_W, F4_H)
        with Locations((-445.6349377941, 139.7)):
            Rectangle(F4_W, F4_H)
    extrude(amount=F5_DEPTH)


with BuildPart() as f7:
    # F6 (on Front) → F7 (new body)
    with BuildSketch(Plane.XZ):
        with BuildLine():
            ThreePointArc((-726.009471792, 39.3724814057), (-723.043363314, 45.4170643565), (-722.0234581947, 52.0724814057))
            ThreePointArc((-722.0234581947, 52.0724814057), (-723.043363314, 58.727898455), (-726.009471792, 64.7724814057))
            Line((-726.009471792, 64.7724814057), (-762.4874445975, 64.7724814057))
            ThreePointArc((-762.4874445975, 64.7724814057), (-766.4734581947, 52.0724814057), (-762.4874445975, 39.3724814057))
            Line((-762.4874445975, 39.3724814057), (-726.009471792, 39.3724814057))
        make_face()
        with Locations((-744.2484581947, 52.0724814057)):
            Circle(F6_R, mode=Mode.SUBTRACT)
        with BuildLine():
            ThreePointArc((-762.4874445975, 39.3724814057), (-766.4734581947, 52.0724814057), (-762.4874445975, 64.7724814057))
            Line((-762.4874445975, 64.7724814057), (-820.4484581947, 64.7724814057))
            Line((-820.4484581947, 64.7724814057), (-820.4484581947, 39.3724814057))
            Line((-820.4484581947, 39.3724814057), (-762.4874445975, 39.3724814057))
        make_face()
        with BuildLine():
            ThreePointArc((-726.009471792, 64.7724814057), (-723.043363314, 58.727898455), (-722.0234581947, 52.0724814057))
            ThreePointArc((-722.0234581947, 52.0724814057), (-723.043363314, 45.4170643565), (-726.009471792, 39.3724814057))
            Line((-726.009471792, 39.3724814057), (-668.0484581947, 39.3724814057))
            Line((-668.0484581947, 39.3724814057), (-668.0484581947, 64.7724814057))
            Line((-668.0484581947, 64.7724814057), (-726.009471792, 64.7724814057))
        make_face()
        with BuildLine():
            Line((-762.4874445975, 64.7724814057), (-726.009471792, 64.7724814057))
            ThreePointArc((-726.009471792, 64.7724814057), (-744.2484581947, 74.2974814057), (-762.4874445975, 64.7724814057))
        make_face()
        with Locations((-744.2484581947, 71.1224814057)):
            Circle(F6_R_2, mode=Mode.SUBTRACT)
        with BuildLine():
            ThreePointArc((-762.4874445975, 39.3724814057), (-744.2484581947, 29.8474814057), (-726.009471792, 39.3724814057))
            Line((-726.009471792, 39.3724814057), (-762.4874445975, 39.3724814057))
        make_face()
        with Locations((-744.2484581947, 33.0224814057)):
            Circle(F6_R_2, mode=Mode.SUBTRACT)
    extrude(amount=F7_DEPTH)

    # F8 (on face) → F9 (cut, through all)
    with BuildSketch(Plane.XZ.offset(3.175)):
        with Locations((-744.2484581947, 58.4224814057)):
            Rectangle(F8_W, F8_H)
        with Locations((-769.6484581947, 58.4224814057)):
            Rectangle(F8_W, F8_H)
        with Locations((-795.0484581947, 58.4224814057)):
            Rectangle(F8_W, F8_H)
        with Locations((-718.8484581947, 58.4224814057)):
            Rectangle(F8_W, F8_H)
        with Locations((-693.4484581947, 58.4224814057)):
            Rectangle(F8_W, F8_H)
        with Locations((-744.2484581947, 45.7224814057)):
            Rectangle(F8_W, F8_H)
        with Locations((-769.6484581947, 45.7224814057)):
            Rectangle(F8_W, F8_H)
        with Locations((-718.8484581947, 45.7224814057)):
            Rectangle(F8_W, F8_H)
        with Locations((-795.0484581947, 45.7224814057)):
            Rectangle(F8_W, F8_H)
        with Locations((-693.4484581947, 45.7224814057)):
            Rectangle(F8_W, F8_H)
        with Locations((-815.6859581947, 52.0724814057)):
            Rectangle(F8_W_2, F8_H_2)
        with Locations((-672.8109581947, 52.0724814057)):
            Rectangle(F8_W_2, F8_H_2)
    extrude(amount=-F9_DEPTH, mode=Mode.SUBTRACT)


solid = Compound([f1.part, f3.part, f5.part, f7.part])
